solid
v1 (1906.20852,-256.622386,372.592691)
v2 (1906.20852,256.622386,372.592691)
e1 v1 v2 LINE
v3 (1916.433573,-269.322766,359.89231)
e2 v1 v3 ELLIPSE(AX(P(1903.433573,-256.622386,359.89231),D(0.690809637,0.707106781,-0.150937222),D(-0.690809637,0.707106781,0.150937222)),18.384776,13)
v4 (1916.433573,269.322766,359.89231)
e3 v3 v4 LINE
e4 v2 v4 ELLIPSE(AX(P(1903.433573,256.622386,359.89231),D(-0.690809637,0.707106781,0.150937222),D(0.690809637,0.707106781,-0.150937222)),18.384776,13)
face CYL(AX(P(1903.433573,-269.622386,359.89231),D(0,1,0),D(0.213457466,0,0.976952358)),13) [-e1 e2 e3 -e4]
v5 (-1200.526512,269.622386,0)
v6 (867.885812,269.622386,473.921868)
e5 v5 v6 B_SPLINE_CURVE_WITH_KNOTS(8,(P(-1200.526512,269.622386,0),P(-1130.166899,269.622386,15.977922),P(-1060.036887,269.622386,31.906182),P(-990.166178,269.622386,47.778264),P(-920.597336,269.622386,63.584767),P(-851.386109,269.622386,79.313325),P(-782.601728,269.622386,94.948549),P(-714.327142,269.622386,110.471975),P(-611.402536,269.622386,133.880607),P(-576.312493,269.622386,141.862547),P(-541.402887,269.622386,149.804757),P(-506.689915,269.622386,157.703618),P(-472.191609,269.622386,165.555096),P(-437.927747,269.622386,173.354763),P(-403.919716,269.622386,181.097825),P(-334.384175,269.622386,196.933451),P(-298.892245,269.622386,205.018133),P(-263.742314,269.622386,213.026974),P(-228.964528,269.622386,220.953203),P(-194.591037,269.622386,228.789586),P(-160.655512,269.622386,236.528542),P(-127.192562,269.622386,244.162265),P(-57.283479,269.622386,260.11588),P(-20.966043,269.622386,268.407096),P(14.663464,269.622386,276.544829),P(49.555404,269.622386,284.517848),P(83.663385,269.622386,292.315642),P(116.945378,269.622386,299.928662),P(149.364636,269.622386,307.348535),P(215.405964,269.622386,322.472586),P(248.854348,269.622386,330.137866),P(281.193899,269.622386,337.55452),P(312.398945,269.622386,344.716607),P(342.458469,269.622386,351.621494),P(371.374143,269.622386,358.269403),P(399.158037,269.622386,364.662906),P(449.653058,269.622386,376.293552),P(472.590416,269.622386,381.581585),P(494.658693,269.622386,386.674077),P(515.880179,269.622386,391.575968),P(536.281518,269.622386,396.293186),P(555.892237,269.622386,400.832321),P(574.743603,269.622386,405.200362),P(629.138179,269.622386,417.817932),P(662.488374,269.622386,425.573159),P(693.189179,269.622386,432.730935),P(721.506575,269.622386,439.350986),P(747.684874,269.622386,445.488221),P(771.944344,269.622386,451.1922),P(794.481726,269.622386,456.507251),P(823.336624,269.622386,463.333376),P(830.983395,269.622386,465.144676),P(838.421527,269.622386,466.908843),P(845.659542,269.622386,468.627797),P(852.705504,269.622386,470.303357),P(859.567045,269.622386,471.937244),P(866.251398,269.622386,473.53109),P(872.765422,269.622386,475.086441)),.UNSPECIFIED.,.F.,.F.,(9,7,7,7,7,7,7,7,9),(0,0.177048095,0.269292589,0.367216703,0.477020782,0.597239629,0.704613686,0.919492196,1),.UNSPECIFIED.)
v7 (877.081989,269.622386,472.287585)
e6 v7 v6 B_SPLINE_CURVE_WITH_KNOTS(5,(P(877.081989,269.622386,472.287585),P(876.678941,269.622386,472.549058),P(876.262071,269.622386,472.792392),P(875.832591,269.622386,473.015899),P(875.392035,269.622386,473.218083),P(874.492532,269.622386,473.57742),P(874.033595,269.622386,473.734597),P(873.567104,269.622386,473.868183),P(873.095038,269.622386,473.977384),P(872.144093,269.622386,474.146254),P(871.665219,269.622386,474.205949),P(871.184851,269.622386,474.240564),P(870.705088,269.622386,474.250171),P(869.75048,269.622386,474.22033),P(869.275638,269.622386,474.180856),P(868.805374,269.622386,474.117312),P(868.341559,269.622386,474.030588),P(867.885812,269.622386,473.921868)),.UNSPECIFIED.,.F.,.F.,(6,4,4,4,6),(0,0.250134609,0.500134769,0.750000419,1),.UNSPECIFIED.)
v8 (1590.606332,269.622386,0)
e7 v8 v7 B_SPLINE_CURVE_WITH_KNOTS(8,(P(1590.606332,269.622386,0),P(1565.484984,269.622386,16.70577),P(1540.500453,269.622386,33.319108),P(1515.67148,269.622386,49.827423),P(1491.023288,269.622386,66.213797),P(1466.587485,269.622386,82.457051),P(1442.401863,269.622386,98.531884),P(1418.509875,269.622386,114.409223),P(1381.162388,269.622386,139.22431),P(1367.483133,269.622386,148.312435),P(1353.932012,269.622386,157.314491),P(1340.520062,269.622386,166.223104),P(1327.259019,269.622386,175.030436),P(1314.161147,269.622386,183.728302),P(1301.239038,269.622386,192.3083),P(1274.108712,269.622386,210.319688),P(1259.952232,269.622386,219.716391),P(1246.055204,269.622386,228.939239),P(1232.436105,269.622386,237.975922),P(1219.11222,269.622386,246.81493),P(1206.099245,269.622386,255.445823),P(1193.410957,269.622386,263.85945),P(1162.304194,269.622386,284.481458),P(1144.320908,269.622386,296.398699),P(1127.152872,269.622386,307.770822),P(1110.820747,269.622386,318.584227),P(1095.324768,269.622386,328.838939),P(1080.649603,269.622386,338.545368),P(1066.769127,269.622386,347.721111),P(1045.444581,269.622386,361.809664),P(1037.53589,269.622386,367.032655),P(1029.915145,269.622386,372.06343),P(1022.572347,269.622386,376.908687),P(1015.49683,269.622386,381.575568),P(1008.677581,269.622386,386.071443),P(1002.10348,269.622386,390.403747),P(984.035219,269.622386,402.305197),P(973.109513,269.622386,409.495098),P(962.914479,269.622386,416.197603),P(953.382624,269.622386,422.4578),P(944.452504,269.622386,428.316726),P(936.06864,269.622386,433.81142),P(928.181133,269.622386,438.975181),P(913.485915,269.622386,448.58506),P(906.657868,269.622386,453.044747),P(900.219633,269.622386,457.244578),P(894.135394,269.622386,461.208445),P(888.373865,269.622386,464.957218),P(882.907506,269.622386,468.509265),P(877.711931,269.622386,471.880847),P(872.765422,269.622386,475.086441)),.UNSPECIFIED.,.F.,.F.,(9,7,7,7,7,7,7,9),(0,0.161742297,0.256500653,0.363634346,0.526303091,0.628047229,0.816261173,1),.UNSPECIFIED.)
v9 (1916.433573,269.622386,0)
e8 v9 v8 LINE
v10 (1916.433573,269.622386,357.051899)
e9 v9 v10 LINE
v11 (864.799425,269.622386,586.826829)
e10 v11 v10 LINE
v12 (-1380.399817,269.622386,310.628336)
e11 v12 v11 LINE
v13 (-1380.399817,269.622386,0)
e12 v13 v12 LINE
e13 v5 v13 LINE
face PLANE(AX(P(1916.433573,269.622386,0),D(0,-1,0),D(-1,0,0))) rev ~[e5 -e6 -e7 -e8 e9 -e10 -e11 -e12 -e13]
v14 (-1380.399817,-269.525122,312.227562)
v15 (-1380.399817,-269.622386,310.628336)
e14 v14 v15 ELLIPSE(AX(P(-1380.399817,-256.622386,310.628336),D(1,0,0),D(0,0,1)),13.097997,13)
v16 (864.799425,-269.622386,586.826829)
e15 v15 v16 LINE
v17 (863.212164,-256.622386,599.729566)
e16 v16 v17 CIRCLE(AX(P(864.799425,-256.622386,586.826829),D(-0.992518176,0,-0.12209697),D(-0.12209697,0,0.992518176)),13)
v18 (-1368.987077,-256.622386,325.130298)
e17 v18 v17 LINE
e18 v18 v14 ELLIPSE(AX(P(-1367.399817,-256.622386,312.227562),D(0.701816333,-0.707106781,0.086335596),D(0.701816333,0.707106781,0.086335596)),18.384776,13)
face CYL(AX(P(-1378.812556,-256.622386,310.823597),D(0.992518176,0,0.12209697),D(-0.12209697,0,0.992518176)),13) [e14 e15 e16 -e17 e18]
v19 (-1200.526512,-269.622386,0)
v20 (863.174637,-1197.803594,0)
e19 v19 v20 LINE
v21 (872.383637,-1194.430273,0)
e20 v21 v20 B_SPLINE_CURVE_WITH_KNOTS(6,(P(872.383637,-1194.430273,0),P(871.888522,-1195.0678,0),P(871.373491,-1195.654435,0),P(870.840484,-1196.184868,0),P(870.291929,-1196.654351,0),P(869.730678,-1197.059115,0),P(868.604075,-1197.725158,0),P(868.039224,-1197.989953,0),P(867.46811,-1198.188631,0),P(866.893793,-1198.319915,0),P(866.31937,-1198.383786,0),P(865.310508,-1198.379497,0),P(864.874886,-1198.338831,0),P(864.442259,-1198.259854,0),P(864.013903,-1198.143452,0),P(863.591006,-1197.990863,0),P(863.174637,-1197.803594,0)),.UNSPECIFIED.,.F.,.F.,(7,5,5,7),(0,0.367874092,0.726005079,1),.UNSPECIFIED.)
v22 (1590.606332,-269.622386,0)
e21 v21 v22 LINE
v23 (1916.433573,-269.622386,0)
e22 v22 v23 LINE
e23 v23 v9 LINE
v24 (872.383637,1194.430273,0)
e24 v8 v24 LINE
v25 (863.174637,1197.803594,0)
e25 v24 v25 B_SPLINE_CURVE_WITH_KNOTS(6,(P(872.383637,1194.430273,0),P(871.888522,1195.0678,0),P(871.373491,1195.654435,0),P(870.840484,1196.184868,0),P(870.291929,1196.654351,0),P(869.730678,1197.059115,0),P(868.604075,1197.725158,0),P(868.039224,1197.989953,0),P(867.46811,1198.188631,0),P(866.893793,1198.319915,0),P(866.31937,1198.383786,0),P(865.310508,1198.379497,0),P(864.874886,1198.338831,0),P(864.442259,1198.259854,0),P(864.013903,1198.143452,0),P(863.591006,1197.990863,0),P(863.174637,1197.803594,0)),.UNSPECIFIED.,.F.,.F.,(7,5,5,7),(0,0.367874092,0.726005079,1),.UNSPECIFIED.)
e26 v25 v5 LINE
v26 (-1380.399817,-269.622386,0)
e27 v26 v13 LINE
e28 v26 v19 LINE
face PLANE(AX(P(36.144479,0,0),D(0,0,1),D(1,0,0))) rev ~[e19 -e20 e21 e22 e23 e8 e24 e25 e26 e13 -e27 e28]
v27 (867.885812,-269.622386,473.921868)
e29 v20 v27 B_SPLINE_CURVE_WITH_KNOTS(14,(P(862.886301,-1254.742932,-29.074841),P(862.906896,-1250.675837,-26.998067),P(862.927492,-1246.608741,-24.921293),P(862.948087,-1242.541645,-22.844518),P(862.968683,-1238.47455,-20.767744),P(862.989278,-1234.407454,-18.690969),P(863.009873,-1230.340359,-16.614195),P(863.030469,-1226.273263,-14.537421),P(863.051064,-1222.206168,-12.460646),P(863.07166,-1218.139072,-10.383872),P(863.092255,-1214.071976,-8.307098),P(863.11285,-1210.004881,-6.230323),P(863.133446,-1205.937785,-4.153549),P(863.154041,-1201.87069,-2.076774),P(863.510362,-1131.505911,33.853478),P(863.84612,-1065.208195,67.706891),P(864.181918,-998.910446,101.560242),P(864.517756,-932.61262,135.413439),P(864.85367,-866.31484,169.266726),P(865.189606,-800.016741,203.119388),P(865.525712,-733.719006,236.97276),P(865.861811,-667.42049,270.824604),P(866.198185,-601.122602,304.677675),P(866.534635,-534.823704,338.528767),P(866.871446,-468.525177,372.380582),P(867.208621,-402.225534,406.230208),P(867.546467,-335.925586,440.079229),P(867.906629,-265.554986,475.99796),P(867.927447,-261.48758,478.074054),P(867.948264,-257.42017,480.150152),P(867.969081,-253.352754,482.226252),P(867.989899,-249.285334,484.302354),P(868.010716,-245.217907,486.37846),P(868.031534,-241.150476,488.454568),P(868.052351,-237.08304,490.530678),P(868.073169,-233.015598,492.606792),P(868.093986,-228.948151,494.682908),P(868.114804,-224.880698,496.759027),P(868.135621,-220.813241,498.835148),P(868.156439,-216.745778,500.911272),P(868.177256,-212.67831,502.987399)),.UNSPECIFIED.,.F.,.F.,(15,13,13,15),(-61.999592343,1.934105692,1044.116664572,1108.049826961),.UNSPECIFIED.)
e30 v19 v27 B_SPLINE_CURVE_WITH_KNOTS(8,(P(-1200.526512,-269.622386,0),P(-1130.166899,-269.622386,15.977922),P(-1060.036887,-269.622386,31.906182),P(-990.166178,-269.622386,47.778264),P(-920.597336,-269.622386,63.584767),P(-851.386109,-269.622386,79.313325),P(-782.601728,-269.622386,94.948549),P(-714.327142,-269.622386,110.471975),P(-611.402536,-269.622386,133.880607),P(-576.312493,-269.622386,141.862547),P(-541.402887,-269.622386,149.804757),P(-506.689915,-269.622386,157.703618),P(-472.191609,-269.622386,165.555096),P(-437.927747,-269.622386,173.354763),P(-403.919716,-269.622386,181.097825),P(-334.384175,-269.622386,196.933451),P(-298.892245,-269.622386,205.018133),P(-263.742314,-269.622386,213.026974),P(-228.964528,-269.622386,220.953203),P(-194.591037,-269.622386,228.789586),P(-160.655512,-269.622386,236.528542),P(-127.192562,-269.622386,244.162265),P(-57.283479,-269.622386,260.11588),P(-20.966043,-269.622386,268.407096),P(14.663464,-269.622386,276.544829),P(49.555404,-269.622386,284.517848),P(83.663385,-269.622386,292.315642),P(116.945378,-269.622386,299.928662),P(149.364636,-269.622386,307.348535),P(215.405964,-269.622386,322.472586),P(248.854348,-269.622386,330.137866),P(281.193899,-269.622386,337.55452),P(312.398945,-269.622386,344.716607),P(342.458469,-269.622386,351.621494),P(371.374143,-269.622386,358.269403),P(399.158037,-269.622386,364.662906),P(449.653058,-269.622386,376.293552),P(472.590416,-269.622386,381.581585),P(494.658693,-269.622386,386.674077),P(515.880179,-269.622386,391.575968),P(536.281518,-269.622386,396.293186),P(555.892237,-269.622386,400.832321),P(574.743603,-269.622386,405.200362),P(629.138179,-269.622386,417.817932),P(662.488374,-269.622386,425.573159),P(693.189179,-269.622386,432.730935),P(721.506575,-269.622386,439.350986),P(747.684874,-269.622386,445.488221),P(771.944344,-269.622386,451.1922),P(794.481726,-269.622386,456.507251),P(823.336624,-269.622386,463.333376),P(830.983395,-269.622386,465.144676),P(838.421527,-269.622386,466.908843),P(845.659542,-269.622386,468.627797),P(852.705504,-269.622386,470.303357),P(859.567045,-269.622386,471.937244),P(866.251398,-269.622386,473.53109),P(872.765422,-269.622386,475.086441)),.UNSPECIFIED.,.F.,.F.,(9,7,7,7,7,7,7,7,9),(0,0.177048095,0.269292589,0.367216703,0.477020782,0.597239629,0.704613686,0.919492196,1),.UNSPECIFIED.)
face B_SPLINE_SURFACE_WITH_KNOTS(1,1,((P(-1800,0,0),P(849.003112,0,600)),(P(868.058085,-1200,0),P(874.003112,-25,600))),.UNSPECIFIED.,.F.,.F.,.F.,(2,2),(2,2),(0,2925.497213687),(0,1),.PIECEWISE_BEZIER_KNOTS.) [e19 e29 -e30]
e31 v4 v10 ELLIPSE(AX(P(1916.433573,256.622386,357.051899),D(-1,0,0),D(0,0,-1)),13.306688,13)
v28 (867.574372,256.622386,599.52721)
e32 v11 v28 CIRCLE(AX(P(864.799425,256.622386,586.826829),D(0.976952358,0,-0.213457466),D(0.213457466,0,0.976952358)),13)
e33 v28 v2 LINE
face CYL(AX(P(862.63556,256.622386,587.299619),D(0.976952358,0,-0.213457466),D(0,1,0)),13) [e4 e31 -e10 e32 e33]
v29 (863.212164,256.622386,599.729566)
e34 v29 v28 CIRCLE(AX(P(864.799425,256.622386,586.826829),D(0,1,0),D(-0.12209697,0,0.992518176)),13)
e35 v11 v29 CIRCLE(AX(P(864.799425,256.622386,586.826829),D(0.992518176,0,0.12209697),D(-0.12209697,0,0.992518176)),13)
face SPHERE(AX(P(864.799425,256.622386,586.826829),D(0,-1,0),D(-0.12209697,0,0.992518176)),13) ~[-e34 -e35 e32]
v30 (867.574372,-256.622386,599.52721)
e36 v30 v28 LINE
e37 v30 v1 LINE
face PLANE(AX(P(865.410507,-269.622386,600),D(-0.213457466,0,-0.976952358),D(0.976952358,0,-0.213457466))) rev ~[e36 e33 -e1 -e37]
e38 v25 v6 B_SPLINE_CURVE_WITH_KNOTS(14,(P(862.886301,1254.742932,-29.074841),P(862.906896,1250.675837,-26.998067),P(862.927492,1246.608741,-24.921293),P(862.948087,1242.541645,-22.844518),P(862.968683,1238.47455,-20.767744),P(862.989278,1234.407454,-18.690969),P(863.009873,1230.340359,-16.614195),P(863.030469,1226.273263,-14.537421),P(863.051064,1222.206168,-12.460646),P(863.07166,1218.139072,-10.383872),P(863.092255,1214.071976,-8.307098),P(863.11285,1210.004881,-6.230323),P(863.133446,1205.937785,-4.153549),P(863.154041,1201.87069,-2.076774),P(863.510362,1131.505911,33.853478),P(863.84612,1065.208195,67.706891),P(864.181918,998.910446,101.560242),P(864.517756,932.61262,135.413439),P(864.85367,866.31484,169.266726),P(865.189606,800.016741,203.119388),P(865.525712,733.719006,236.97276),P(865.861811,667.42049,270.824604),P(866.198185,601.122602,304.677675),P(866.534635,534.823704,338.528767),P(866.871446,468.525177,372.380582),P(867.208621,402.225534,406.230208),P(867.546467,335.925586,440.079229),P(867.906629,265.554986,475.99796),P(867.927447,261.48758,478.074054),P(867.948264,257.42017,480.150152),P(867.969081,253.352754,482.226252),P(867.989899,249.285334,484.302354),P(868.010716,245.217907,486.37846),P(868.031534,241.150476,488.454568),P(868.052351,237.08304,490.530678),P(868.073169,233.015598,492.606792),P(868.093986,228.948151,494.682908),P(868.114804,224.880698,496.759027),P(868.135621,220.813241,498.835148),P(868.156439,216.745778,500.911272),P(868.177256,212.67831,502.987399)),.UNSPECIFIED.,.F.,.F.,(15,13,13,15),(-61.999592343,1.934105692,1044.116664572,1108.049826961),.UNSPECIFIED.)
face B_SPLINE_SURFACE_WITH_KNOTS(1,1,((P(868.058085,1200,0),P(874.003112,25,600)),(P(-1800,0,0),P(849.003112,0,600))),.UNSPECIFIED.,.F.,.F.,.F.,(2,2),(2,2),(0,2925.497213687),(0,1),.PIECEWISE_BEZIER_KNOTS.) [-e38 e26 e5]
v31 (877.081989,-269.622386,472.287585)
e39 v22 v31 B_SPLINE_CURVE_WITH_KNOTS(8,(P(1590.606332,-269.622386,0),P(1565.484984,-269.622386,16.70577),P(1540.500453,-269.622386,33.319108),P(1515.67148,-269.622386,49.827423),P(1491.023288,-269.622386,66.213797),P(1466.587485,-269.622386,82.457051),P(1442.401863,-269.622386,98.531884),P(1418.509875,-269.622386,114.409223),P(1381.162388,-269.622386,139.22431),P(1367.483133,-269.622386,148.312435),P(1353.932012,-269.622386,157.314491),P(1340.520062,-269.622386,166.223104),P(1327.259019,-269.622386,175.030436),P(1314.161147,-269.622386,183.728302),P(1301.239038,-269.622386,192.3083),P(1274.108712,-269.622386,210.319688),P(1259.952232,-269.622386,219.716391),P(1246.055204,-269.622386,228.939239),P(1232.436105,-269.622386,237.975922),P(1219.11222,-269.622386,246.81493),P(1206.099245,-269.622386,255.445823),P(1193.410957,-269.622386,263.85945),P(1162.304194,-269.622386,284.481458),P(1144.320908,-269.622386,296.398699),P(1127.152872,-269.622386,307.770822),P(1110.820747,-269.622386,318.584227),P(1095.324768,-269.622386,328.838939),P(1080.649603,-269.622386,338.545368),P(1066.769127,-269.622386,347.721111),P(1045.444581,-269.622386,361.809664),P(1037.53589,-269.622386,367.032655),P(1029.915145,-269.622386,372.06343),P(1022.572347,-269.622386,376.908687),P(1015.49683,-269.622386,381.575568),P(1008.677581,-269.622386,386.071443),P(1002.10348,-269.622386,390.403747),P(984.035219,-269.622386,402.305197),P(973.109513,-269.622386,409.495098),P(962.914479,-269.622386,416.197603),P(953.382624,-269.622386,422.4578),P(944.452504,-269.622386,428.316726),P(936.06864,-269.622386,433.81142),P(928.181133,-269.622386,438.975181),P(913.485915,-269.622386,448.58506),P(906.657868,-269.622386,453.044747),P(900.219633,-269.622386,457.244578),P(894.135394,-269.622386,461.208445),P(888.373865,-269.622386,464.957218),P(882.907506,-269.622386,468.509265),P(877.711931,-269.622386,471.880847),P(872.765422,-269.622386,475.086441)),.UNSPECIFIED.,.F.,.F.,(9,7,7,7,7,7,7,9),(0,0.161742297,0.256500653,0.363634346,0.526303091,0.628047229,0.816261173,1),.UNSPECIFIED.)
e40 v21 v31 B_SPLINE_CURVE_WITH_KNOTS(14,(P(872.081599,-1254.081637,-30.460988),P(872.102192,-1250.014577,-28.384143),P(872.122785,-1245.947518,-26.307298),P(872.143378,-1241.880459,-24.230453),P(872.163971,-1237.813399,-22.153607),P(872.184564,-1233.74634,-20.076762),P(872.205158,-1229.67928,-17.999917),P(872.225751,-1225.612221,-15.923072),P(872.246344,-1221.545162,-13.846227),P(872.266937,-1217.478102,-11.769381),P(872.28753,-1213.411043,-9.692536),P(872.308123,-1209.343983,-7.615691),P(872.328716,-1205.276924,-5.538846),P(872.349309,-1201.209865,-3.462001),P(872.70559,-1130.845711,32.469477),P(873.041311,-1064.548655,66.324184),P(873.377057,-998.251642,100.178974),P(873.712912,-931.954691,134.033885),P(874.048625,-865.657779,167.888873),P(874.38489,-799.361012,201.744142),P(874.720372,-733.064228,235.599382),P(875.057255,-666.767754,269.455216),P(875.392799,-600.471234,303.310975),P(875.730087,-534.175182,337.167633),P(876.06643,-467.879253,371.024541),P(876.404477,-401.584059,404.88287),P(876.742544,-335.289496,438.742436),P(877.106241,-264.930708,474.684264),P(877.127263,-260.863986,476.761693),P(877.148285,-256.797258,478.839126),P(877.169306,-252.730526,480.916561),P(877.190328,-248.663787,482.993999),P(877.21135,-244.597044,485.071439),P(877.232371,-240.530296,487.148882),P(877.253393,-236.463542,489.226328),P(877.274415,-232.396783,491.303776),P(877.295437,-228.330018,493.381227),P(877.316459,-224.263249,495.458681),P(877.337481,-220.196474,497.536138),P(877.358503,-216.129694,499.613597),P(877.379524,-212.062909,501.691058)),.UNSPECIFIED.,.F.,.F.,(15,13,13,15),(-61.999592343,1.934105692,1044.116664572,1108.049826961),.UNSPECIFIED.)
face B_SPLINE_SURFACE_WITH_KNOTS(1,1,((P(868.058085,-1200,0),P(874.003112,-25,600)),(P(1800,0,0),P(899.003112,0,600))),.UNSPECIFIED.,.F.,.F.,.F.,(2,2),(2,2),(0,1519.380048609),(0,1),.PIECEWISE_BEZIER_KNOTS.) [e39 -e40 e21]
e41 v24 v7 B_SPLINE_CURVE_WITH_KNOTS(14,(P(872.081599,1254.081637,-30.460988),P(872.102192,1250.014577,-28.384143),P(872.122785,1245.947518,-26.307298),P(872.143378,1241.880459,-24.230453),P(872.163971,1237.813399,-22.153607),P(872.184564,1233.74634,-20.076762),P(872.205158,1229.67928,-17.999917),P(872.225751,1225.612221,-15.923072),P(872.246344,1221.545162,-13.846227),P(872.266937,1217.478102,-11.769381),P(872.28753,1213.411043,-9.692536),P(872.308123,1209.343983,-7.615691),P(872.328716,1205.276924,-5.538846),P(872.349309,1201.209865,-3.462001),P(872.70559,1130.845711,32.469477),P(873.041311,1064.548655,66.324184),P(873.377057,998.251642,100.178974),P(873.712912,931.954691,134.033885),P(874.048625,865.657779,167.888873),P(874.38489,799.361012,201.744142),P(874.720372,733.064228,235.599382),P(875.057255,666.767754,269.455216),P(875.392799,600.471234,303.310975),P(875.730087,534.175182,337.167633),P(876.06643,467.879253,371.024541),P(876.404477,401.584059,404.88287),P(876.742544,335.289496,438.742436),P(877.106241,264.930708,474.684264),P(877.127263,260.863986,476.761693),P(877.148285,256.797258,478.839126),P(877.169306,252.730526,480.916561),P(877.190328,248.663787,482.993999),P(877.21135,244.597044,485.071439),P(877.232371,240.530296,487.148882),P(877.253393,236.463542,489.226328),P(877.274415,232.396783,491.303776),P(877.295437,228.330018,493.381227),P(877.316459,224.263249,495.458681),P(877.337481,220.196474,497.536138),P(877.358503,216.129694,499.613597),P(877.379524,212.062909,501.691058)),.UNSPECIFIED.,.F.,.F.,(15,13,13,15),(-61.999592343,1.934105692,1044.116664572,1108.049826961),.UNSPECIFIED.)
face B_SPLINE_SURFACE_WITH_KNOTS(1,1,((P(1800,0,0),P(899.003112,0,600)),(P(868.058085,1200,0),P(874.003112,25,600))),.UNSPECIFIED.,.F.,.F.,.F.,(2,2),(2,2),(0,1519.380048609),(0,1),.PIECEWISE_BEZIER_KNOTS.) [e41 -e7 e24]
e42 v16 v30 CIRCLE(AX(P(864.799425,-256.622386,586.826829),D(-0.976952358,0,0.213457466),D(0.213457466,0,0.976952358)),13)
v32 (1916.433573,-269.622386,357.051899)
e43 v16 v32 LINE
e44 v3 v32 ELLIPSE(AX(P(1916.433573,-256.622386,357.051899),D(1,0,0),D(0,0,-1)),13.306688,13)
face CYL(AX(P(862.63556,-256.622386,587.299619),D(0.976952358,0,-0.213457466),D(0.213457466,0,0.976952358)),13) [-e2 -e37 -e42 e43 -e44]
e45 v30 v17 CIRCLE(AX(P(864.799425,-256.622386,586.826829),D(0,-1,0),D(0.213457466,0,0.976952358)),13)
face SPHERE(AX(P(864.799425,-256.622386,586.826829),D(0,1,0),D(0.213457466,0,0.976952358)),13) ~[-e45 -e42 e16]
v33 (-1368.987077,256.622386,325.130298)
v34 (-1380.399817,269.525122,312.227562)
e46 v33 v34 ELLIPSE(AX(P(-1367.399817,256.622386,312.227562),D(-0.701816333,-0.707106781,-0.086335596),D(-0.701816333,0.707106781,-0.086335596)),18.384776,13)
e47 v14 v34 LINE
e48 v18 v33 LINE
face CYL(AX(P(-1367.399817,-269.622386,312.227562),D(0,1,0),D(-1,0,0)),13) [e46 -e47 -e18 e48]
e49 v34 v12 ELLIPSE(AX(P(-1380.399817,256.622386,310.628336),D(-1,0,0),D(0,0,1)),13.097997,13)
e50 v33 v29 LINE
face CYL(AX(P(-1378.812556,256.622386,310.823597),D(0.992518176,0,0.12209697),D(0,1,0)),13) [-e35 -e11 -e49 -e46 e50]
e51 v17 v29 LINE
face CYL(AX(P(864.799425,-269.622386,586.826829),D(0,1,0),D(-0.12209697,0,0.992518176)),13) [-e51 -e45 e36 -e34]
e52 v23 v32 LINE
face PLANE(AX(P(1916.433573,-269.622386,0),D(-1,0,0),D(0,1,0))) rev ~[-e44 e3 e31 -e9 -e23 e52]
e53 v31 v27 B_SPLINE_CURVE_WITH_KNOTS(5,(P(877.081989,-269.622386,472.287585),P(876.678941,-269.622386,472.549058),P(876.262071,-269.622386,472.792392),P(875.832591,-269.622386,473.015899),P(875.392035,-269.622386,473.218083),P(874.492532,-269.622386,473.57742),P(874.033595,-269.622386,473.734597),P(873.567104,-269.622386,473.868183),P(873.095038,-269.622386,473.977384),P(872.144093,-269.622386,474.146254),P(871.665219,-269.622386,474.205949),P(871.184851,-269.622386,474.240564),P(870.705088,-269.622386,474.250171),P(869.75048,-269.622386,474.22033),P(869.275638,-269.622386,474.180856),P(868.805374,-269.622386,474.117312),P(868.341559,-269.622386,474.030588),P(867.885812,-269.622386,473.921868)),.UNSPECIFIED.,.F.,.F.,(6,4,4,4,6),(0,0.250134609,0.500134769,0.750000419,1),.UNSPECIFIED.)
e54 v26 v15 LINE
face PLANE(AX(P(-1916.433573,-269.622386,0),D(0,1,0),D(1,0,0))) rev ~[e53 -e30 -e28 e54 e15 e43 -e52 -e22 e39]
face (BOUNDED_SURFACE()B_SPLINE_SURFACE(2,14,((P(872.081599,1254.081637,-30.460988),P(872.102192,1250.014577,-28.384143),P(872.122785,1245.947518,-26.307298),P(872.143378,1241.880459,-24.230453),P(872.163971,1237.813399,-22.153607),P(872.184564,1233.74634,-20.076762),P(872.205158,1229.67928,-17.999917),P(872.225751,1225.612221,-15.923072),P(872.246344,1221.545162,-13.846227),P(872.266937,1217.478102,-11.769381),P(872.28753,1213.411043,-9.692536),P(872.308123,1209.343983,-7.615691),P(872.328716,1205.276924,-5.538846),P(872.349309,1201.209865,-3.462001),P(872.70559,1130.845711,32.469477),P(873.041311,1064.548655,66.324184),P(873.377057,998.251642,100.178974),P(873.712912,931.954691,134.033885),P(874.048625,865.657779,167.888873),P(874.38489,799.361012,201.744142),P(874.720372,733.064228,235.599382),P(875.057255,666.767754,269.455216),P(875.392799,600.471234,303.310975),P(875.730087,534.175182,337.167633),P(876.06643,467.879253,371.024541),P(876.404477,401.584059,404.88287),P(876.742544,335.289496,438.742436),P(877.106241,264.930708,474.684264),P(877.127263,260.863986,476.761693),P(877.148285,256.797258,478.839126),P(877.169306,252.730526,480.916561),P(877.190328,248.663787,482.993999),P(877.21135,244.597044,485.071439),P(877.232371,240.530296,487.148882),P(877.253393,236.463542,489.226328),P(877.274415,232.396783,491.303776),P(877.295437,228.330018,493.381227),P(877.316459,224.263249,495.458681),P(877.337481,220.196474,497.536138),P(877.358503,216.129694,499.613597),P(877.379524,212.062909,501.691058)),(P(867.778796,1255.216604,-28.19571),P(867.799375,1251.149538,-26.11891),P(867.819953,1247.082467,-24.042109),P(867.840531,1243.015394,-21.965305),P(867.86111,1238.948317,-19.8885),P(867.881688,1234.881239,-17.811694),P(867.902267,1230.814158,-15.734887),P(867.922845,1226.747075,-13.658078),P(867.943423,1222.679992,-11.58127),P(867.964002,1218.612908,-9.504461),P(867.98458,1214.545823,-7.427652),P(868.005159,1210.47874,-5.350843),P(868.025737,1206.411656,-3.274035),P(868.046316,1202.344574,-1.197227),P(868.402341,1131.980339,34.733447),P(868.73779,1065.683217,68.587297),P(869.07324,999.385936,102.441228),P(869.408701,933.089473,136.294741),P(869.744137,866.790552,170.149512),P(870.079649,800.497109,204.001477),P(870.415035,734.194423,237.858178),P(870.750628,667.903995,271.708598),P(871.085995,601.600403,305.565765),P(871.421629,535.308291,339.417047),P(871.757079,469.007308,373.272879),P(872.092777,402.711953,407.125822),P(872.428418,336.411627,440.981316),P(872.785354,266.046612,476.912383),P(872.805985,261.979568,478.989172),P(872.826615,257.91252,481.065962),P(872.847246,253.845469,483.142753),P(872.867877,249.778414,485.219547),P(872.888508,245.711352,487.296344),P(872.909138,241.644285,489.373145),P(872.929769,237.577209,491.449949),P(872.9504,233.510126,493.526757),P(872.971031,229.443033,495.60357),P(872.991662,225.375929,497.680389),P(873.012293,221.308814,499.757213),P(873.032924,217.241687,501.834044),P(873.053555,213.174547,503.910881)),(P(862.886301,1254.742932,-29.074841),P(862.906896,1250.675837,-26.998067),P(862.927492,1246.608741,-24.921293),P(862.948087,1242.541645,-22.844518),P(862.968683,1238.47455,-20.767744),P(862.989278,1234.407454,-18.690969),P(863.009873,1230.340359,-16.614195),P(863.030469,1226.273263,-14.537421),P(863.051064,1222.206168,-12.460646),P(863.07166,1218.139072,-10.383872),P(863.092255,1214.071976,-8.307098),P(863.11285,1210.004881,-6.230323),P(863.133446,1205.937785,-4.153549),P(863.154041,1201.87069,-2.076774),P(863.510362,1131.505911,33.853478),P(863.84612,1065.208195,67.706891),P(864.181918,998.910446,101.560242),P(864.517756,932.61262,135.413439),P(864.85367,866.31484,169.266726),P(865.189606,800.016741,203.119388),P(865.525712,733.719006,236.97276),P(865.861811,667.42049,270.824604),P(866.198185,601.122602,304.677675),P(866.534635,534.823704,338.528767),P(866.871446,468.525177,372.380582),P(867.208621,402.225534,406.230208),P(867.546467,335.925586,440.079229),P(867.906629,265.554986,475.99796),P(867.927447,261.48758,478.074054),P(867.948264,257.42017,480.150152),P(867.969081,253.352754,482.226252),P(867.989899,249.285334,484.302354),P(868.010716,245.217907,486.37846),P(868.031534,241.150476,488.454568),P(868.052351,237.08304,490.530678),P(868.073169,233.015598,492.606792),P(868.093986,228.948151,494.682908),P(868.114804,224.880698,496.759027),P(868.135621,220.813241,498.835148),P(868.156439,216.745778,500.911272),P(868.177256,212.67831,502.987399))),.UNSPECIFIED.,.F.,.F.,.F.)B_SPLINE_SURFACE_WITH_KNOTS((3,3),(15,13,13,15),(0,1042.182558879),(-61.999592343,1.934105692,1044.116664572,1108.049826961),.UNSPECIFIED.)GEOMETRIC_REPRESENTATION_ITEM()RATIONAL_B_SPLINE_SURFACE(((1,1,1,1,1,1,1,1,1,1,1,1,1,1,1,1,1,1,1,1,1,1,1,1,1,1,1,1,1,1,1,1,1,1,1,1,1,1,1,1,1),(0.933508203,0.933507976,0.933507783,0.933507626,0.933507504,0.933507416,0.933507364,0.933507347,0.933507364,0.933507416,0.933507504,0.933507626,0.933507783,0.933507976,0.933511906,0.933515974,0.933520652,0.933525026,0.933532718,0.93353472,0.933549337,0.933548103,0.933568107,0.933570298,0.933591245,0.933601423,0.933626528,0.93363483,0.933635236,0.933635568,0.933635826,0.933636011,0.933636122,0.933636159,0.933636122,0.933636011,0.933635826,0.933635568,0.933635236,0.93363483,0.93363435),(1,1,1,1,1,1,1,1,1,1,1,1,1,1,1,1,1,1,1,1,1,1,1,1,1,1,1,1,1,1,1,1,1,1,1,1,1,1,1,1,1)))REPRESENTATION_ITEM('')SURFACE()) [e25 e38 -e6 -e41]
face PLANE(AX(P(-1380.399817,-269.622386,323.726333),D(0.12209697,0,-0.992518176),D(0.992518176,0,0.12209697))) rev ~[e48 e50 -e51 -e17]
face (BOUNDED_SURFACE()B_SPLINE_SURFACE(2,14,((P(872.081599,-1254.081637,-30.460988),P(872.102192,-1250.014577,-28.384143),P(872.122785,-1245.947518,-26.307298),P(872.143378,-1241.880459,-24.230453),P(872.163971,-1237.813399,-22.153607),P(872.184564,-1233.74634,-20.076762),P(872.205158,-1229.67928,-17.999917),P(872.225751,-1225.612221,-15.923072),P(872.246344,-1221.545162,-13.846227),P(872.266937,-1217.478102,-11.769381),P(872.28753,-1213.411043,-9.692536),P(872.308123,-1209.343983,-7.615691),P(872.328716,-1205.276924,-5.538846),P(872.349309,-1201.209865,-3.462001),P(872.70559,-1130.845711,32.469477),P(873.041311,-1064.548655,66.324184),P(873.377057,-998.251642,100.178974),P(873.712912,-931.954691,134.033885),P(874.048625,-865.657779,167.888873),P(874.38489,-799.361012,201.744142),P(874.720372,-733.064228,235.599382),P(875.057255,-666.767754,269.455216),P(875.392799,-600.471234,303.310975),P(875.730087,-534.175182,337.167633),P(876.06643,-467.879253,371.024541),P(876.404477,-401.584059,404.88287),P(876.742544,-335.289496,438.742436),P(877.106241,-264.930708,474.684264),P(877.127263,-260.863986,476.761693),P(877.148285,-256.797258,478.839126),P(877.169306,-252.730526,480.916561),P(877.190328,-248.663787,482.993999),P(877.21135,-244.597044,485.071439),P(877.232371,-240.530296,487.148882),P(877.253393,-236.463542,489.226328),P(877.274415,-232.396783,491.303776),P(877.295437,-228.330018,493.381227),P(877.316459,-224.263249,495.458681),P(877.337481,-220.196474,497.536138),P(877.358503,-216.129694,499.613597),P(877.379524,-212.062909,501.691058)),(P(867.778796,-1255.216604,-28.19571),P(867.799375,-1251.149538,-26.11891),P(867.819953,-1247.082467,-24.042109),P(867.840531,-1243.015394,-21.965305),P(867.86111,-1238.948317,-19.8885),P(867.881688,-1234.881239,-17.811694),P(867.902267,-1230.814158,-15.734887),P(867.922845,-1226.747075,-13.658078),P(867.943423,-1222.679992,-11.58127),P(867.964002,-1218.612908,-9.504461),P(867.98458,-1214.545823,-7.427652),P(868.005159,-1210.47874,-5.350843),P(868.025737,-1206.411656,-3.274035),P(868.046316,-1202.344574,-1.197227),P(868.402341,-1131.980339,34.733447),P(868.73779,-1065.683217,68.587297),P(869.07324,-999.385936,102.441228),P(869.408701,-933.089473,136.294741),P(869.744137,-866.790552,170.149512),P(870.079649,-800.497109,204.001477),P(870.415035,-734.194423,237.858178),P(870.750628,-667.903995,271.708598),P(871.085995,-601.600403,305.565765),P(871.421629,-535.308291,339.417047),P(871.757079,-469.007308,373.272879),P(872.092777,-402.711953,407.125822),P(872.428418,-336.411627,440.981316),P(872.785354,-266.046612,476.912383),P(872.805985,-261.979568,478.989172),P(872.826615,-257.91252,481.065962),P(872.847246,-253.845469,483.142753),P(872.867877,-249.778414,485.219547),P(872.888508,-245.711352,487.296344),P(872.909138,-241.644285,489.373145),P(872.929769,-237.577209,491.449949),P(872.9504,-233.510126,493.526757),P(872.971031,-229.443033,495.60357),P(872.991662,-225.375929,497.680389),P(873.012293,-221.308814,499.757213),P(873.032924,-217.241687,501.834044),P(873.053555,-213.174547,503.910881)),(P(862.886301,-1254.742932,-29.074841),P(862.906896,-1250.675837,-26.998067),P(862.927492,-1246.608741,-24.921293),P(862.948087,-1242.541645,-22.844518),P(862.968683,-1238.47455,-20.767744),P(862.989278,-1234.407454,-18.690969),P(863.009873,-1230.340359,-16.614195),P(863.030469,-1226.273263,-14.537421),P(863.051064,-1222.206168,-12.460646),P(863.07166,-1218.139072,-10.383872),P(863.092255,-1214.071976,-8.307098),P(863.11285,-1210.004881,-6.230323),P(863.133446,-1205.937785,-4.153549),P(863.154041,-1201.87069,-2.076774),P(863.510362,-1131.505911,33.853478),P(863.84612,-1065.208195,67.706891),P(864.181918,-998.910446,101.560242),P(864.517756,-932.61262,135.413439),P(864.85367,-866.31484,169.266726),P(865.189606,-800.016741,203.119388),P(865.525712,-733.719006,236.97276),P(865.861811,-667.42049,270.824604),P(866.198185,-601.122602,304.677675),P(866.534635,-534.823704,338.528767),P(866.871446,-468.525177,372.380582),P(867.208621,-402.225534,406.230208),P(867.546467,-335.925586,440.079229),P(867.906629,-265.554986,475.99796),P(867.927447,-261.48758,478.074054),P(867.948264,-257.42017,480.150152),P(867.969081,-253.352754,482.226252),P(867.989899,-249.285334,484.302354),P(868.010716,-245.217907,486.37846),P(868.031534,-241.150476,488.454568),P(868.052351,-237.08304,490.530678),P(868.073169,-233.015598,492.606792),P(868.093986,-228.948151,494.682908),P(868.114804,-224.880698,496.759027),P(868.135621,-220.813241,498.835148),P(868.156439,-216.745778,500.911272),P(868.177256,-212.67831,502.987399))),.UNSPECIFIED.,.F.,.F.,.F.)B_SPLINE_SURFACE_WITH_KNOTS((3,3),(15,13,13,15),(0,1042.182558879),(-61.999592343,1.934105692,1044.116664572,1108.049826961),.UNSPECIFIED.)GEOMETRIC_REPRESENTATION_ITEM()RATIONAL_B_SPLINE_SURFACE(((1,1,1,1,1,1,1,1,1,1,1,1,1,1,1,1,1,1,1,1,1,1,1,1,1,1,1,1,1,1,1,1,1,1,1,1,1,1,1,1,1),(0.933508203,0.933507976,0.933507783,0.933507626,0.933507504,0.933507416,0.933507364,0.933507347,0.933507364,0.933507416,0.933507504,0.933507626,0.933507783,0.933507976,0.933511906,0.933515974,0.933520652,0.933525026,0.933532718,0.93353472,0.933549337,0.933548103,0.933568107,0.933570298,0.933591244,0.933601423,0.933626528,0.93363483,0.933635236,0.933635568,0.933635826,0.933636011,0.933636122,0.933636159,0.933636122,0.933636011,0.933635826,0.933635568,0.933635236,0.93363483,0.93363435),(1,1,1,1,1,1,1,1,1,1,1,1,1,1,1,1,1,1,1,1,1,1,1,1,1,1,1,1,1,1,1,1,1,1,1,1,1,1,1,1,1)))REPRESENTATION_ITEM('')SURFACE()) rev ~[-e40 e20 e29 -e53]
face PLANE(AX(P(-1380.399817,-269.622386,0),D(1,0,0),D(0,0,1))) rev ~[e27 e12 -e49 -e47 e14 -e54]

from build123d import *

# Parameters (mm, degrees)
F5_DEPTH = 600
F7_DEPTH = 1469.6233856019
F8_R     = 13


with BuildPart() as f3:
    # F0 (on Top) → F3 section 0
    with BuildSketch(Plane.XY):
        Polygon((1800, 0), (868.0580854416, 1200), (-1800, 0), (868.0580854416, -1200), align=None)
    # F2 (on offset) → F3 section 1
    with BuildSketch(Plane.XY.offset(600)):
        Polygon((899.0031123161, 0), (874.0031123161, 25), (849.0031123161, 0), (874.0031123161, -25), align=None)
    loft()

    # F4 (on face) → F5 (join)
    with BuildSketch(Plane.XY):
        Polygon((-1200.5265119548, -269.6223855019), (1590.6063315397, -269.6223855019), (1800, 0), (1590.6063315397, 269.6223855019), (-1200.5265119548, 269.6223855019), (-1800, 0), align=None)
        Polygon((-1916.4335727692, -269.6223855019), (-1200.5265119548, -269.6223855019), (-1800, 0), (-1200.5265119548, 269.6223855019), (-1916.4335727692, 269.6223855019), align=None)
        Polygon((1590.6063315397, -269.6223855019), (1916.4335727692, -269.6223855019), (1916.4335727692, 269.6223855019), (1590.6063315397, 269.6223855019), (1800, 0), align=None)
    extrude(amount=F5_DEPTH)

    # F6 (on face) → F7 (cut, through all)
    with BuildSketch(Plane.XZ.offset(269.6223855019)):
        Polygon((-1380.3998167432, 323.7263331278), (865.4105067253, 600), (-1916.4335727692, 600), (-1916.4335727692, 0), (-1380.3998167432, 0), align=None)
        Polygon((1916.4335727692, 600), (865.4105067253, 600), (1916.4335727692, 370.3585863113), align=None)
    extrude(amount=-F7_DEPTH, mode=Mode.SUBTRACT)

    # F8
    f8_edges = [f3.edges().sort_by_distance(p)[0] for p in [
        (1390.92204, -269.622386, 485.179293),
        (1916.433573, 0, 370.358586),
        (-257.494655, -269.622386, 461.863167),
        (865.410507, 0, 600),
        (-257.494655, 269.622386, 461.863167),
        (-1380.399817, 0, 323.726333),
        (1390.92204, 269.622386, 485.179293),
        (870.411753, -734.811193, 237.543221),
        (870.411753, 734.811193, 237.543221),
    ]]
    fillet(f8_edges, radius=F8_R)


solid = f3.part
